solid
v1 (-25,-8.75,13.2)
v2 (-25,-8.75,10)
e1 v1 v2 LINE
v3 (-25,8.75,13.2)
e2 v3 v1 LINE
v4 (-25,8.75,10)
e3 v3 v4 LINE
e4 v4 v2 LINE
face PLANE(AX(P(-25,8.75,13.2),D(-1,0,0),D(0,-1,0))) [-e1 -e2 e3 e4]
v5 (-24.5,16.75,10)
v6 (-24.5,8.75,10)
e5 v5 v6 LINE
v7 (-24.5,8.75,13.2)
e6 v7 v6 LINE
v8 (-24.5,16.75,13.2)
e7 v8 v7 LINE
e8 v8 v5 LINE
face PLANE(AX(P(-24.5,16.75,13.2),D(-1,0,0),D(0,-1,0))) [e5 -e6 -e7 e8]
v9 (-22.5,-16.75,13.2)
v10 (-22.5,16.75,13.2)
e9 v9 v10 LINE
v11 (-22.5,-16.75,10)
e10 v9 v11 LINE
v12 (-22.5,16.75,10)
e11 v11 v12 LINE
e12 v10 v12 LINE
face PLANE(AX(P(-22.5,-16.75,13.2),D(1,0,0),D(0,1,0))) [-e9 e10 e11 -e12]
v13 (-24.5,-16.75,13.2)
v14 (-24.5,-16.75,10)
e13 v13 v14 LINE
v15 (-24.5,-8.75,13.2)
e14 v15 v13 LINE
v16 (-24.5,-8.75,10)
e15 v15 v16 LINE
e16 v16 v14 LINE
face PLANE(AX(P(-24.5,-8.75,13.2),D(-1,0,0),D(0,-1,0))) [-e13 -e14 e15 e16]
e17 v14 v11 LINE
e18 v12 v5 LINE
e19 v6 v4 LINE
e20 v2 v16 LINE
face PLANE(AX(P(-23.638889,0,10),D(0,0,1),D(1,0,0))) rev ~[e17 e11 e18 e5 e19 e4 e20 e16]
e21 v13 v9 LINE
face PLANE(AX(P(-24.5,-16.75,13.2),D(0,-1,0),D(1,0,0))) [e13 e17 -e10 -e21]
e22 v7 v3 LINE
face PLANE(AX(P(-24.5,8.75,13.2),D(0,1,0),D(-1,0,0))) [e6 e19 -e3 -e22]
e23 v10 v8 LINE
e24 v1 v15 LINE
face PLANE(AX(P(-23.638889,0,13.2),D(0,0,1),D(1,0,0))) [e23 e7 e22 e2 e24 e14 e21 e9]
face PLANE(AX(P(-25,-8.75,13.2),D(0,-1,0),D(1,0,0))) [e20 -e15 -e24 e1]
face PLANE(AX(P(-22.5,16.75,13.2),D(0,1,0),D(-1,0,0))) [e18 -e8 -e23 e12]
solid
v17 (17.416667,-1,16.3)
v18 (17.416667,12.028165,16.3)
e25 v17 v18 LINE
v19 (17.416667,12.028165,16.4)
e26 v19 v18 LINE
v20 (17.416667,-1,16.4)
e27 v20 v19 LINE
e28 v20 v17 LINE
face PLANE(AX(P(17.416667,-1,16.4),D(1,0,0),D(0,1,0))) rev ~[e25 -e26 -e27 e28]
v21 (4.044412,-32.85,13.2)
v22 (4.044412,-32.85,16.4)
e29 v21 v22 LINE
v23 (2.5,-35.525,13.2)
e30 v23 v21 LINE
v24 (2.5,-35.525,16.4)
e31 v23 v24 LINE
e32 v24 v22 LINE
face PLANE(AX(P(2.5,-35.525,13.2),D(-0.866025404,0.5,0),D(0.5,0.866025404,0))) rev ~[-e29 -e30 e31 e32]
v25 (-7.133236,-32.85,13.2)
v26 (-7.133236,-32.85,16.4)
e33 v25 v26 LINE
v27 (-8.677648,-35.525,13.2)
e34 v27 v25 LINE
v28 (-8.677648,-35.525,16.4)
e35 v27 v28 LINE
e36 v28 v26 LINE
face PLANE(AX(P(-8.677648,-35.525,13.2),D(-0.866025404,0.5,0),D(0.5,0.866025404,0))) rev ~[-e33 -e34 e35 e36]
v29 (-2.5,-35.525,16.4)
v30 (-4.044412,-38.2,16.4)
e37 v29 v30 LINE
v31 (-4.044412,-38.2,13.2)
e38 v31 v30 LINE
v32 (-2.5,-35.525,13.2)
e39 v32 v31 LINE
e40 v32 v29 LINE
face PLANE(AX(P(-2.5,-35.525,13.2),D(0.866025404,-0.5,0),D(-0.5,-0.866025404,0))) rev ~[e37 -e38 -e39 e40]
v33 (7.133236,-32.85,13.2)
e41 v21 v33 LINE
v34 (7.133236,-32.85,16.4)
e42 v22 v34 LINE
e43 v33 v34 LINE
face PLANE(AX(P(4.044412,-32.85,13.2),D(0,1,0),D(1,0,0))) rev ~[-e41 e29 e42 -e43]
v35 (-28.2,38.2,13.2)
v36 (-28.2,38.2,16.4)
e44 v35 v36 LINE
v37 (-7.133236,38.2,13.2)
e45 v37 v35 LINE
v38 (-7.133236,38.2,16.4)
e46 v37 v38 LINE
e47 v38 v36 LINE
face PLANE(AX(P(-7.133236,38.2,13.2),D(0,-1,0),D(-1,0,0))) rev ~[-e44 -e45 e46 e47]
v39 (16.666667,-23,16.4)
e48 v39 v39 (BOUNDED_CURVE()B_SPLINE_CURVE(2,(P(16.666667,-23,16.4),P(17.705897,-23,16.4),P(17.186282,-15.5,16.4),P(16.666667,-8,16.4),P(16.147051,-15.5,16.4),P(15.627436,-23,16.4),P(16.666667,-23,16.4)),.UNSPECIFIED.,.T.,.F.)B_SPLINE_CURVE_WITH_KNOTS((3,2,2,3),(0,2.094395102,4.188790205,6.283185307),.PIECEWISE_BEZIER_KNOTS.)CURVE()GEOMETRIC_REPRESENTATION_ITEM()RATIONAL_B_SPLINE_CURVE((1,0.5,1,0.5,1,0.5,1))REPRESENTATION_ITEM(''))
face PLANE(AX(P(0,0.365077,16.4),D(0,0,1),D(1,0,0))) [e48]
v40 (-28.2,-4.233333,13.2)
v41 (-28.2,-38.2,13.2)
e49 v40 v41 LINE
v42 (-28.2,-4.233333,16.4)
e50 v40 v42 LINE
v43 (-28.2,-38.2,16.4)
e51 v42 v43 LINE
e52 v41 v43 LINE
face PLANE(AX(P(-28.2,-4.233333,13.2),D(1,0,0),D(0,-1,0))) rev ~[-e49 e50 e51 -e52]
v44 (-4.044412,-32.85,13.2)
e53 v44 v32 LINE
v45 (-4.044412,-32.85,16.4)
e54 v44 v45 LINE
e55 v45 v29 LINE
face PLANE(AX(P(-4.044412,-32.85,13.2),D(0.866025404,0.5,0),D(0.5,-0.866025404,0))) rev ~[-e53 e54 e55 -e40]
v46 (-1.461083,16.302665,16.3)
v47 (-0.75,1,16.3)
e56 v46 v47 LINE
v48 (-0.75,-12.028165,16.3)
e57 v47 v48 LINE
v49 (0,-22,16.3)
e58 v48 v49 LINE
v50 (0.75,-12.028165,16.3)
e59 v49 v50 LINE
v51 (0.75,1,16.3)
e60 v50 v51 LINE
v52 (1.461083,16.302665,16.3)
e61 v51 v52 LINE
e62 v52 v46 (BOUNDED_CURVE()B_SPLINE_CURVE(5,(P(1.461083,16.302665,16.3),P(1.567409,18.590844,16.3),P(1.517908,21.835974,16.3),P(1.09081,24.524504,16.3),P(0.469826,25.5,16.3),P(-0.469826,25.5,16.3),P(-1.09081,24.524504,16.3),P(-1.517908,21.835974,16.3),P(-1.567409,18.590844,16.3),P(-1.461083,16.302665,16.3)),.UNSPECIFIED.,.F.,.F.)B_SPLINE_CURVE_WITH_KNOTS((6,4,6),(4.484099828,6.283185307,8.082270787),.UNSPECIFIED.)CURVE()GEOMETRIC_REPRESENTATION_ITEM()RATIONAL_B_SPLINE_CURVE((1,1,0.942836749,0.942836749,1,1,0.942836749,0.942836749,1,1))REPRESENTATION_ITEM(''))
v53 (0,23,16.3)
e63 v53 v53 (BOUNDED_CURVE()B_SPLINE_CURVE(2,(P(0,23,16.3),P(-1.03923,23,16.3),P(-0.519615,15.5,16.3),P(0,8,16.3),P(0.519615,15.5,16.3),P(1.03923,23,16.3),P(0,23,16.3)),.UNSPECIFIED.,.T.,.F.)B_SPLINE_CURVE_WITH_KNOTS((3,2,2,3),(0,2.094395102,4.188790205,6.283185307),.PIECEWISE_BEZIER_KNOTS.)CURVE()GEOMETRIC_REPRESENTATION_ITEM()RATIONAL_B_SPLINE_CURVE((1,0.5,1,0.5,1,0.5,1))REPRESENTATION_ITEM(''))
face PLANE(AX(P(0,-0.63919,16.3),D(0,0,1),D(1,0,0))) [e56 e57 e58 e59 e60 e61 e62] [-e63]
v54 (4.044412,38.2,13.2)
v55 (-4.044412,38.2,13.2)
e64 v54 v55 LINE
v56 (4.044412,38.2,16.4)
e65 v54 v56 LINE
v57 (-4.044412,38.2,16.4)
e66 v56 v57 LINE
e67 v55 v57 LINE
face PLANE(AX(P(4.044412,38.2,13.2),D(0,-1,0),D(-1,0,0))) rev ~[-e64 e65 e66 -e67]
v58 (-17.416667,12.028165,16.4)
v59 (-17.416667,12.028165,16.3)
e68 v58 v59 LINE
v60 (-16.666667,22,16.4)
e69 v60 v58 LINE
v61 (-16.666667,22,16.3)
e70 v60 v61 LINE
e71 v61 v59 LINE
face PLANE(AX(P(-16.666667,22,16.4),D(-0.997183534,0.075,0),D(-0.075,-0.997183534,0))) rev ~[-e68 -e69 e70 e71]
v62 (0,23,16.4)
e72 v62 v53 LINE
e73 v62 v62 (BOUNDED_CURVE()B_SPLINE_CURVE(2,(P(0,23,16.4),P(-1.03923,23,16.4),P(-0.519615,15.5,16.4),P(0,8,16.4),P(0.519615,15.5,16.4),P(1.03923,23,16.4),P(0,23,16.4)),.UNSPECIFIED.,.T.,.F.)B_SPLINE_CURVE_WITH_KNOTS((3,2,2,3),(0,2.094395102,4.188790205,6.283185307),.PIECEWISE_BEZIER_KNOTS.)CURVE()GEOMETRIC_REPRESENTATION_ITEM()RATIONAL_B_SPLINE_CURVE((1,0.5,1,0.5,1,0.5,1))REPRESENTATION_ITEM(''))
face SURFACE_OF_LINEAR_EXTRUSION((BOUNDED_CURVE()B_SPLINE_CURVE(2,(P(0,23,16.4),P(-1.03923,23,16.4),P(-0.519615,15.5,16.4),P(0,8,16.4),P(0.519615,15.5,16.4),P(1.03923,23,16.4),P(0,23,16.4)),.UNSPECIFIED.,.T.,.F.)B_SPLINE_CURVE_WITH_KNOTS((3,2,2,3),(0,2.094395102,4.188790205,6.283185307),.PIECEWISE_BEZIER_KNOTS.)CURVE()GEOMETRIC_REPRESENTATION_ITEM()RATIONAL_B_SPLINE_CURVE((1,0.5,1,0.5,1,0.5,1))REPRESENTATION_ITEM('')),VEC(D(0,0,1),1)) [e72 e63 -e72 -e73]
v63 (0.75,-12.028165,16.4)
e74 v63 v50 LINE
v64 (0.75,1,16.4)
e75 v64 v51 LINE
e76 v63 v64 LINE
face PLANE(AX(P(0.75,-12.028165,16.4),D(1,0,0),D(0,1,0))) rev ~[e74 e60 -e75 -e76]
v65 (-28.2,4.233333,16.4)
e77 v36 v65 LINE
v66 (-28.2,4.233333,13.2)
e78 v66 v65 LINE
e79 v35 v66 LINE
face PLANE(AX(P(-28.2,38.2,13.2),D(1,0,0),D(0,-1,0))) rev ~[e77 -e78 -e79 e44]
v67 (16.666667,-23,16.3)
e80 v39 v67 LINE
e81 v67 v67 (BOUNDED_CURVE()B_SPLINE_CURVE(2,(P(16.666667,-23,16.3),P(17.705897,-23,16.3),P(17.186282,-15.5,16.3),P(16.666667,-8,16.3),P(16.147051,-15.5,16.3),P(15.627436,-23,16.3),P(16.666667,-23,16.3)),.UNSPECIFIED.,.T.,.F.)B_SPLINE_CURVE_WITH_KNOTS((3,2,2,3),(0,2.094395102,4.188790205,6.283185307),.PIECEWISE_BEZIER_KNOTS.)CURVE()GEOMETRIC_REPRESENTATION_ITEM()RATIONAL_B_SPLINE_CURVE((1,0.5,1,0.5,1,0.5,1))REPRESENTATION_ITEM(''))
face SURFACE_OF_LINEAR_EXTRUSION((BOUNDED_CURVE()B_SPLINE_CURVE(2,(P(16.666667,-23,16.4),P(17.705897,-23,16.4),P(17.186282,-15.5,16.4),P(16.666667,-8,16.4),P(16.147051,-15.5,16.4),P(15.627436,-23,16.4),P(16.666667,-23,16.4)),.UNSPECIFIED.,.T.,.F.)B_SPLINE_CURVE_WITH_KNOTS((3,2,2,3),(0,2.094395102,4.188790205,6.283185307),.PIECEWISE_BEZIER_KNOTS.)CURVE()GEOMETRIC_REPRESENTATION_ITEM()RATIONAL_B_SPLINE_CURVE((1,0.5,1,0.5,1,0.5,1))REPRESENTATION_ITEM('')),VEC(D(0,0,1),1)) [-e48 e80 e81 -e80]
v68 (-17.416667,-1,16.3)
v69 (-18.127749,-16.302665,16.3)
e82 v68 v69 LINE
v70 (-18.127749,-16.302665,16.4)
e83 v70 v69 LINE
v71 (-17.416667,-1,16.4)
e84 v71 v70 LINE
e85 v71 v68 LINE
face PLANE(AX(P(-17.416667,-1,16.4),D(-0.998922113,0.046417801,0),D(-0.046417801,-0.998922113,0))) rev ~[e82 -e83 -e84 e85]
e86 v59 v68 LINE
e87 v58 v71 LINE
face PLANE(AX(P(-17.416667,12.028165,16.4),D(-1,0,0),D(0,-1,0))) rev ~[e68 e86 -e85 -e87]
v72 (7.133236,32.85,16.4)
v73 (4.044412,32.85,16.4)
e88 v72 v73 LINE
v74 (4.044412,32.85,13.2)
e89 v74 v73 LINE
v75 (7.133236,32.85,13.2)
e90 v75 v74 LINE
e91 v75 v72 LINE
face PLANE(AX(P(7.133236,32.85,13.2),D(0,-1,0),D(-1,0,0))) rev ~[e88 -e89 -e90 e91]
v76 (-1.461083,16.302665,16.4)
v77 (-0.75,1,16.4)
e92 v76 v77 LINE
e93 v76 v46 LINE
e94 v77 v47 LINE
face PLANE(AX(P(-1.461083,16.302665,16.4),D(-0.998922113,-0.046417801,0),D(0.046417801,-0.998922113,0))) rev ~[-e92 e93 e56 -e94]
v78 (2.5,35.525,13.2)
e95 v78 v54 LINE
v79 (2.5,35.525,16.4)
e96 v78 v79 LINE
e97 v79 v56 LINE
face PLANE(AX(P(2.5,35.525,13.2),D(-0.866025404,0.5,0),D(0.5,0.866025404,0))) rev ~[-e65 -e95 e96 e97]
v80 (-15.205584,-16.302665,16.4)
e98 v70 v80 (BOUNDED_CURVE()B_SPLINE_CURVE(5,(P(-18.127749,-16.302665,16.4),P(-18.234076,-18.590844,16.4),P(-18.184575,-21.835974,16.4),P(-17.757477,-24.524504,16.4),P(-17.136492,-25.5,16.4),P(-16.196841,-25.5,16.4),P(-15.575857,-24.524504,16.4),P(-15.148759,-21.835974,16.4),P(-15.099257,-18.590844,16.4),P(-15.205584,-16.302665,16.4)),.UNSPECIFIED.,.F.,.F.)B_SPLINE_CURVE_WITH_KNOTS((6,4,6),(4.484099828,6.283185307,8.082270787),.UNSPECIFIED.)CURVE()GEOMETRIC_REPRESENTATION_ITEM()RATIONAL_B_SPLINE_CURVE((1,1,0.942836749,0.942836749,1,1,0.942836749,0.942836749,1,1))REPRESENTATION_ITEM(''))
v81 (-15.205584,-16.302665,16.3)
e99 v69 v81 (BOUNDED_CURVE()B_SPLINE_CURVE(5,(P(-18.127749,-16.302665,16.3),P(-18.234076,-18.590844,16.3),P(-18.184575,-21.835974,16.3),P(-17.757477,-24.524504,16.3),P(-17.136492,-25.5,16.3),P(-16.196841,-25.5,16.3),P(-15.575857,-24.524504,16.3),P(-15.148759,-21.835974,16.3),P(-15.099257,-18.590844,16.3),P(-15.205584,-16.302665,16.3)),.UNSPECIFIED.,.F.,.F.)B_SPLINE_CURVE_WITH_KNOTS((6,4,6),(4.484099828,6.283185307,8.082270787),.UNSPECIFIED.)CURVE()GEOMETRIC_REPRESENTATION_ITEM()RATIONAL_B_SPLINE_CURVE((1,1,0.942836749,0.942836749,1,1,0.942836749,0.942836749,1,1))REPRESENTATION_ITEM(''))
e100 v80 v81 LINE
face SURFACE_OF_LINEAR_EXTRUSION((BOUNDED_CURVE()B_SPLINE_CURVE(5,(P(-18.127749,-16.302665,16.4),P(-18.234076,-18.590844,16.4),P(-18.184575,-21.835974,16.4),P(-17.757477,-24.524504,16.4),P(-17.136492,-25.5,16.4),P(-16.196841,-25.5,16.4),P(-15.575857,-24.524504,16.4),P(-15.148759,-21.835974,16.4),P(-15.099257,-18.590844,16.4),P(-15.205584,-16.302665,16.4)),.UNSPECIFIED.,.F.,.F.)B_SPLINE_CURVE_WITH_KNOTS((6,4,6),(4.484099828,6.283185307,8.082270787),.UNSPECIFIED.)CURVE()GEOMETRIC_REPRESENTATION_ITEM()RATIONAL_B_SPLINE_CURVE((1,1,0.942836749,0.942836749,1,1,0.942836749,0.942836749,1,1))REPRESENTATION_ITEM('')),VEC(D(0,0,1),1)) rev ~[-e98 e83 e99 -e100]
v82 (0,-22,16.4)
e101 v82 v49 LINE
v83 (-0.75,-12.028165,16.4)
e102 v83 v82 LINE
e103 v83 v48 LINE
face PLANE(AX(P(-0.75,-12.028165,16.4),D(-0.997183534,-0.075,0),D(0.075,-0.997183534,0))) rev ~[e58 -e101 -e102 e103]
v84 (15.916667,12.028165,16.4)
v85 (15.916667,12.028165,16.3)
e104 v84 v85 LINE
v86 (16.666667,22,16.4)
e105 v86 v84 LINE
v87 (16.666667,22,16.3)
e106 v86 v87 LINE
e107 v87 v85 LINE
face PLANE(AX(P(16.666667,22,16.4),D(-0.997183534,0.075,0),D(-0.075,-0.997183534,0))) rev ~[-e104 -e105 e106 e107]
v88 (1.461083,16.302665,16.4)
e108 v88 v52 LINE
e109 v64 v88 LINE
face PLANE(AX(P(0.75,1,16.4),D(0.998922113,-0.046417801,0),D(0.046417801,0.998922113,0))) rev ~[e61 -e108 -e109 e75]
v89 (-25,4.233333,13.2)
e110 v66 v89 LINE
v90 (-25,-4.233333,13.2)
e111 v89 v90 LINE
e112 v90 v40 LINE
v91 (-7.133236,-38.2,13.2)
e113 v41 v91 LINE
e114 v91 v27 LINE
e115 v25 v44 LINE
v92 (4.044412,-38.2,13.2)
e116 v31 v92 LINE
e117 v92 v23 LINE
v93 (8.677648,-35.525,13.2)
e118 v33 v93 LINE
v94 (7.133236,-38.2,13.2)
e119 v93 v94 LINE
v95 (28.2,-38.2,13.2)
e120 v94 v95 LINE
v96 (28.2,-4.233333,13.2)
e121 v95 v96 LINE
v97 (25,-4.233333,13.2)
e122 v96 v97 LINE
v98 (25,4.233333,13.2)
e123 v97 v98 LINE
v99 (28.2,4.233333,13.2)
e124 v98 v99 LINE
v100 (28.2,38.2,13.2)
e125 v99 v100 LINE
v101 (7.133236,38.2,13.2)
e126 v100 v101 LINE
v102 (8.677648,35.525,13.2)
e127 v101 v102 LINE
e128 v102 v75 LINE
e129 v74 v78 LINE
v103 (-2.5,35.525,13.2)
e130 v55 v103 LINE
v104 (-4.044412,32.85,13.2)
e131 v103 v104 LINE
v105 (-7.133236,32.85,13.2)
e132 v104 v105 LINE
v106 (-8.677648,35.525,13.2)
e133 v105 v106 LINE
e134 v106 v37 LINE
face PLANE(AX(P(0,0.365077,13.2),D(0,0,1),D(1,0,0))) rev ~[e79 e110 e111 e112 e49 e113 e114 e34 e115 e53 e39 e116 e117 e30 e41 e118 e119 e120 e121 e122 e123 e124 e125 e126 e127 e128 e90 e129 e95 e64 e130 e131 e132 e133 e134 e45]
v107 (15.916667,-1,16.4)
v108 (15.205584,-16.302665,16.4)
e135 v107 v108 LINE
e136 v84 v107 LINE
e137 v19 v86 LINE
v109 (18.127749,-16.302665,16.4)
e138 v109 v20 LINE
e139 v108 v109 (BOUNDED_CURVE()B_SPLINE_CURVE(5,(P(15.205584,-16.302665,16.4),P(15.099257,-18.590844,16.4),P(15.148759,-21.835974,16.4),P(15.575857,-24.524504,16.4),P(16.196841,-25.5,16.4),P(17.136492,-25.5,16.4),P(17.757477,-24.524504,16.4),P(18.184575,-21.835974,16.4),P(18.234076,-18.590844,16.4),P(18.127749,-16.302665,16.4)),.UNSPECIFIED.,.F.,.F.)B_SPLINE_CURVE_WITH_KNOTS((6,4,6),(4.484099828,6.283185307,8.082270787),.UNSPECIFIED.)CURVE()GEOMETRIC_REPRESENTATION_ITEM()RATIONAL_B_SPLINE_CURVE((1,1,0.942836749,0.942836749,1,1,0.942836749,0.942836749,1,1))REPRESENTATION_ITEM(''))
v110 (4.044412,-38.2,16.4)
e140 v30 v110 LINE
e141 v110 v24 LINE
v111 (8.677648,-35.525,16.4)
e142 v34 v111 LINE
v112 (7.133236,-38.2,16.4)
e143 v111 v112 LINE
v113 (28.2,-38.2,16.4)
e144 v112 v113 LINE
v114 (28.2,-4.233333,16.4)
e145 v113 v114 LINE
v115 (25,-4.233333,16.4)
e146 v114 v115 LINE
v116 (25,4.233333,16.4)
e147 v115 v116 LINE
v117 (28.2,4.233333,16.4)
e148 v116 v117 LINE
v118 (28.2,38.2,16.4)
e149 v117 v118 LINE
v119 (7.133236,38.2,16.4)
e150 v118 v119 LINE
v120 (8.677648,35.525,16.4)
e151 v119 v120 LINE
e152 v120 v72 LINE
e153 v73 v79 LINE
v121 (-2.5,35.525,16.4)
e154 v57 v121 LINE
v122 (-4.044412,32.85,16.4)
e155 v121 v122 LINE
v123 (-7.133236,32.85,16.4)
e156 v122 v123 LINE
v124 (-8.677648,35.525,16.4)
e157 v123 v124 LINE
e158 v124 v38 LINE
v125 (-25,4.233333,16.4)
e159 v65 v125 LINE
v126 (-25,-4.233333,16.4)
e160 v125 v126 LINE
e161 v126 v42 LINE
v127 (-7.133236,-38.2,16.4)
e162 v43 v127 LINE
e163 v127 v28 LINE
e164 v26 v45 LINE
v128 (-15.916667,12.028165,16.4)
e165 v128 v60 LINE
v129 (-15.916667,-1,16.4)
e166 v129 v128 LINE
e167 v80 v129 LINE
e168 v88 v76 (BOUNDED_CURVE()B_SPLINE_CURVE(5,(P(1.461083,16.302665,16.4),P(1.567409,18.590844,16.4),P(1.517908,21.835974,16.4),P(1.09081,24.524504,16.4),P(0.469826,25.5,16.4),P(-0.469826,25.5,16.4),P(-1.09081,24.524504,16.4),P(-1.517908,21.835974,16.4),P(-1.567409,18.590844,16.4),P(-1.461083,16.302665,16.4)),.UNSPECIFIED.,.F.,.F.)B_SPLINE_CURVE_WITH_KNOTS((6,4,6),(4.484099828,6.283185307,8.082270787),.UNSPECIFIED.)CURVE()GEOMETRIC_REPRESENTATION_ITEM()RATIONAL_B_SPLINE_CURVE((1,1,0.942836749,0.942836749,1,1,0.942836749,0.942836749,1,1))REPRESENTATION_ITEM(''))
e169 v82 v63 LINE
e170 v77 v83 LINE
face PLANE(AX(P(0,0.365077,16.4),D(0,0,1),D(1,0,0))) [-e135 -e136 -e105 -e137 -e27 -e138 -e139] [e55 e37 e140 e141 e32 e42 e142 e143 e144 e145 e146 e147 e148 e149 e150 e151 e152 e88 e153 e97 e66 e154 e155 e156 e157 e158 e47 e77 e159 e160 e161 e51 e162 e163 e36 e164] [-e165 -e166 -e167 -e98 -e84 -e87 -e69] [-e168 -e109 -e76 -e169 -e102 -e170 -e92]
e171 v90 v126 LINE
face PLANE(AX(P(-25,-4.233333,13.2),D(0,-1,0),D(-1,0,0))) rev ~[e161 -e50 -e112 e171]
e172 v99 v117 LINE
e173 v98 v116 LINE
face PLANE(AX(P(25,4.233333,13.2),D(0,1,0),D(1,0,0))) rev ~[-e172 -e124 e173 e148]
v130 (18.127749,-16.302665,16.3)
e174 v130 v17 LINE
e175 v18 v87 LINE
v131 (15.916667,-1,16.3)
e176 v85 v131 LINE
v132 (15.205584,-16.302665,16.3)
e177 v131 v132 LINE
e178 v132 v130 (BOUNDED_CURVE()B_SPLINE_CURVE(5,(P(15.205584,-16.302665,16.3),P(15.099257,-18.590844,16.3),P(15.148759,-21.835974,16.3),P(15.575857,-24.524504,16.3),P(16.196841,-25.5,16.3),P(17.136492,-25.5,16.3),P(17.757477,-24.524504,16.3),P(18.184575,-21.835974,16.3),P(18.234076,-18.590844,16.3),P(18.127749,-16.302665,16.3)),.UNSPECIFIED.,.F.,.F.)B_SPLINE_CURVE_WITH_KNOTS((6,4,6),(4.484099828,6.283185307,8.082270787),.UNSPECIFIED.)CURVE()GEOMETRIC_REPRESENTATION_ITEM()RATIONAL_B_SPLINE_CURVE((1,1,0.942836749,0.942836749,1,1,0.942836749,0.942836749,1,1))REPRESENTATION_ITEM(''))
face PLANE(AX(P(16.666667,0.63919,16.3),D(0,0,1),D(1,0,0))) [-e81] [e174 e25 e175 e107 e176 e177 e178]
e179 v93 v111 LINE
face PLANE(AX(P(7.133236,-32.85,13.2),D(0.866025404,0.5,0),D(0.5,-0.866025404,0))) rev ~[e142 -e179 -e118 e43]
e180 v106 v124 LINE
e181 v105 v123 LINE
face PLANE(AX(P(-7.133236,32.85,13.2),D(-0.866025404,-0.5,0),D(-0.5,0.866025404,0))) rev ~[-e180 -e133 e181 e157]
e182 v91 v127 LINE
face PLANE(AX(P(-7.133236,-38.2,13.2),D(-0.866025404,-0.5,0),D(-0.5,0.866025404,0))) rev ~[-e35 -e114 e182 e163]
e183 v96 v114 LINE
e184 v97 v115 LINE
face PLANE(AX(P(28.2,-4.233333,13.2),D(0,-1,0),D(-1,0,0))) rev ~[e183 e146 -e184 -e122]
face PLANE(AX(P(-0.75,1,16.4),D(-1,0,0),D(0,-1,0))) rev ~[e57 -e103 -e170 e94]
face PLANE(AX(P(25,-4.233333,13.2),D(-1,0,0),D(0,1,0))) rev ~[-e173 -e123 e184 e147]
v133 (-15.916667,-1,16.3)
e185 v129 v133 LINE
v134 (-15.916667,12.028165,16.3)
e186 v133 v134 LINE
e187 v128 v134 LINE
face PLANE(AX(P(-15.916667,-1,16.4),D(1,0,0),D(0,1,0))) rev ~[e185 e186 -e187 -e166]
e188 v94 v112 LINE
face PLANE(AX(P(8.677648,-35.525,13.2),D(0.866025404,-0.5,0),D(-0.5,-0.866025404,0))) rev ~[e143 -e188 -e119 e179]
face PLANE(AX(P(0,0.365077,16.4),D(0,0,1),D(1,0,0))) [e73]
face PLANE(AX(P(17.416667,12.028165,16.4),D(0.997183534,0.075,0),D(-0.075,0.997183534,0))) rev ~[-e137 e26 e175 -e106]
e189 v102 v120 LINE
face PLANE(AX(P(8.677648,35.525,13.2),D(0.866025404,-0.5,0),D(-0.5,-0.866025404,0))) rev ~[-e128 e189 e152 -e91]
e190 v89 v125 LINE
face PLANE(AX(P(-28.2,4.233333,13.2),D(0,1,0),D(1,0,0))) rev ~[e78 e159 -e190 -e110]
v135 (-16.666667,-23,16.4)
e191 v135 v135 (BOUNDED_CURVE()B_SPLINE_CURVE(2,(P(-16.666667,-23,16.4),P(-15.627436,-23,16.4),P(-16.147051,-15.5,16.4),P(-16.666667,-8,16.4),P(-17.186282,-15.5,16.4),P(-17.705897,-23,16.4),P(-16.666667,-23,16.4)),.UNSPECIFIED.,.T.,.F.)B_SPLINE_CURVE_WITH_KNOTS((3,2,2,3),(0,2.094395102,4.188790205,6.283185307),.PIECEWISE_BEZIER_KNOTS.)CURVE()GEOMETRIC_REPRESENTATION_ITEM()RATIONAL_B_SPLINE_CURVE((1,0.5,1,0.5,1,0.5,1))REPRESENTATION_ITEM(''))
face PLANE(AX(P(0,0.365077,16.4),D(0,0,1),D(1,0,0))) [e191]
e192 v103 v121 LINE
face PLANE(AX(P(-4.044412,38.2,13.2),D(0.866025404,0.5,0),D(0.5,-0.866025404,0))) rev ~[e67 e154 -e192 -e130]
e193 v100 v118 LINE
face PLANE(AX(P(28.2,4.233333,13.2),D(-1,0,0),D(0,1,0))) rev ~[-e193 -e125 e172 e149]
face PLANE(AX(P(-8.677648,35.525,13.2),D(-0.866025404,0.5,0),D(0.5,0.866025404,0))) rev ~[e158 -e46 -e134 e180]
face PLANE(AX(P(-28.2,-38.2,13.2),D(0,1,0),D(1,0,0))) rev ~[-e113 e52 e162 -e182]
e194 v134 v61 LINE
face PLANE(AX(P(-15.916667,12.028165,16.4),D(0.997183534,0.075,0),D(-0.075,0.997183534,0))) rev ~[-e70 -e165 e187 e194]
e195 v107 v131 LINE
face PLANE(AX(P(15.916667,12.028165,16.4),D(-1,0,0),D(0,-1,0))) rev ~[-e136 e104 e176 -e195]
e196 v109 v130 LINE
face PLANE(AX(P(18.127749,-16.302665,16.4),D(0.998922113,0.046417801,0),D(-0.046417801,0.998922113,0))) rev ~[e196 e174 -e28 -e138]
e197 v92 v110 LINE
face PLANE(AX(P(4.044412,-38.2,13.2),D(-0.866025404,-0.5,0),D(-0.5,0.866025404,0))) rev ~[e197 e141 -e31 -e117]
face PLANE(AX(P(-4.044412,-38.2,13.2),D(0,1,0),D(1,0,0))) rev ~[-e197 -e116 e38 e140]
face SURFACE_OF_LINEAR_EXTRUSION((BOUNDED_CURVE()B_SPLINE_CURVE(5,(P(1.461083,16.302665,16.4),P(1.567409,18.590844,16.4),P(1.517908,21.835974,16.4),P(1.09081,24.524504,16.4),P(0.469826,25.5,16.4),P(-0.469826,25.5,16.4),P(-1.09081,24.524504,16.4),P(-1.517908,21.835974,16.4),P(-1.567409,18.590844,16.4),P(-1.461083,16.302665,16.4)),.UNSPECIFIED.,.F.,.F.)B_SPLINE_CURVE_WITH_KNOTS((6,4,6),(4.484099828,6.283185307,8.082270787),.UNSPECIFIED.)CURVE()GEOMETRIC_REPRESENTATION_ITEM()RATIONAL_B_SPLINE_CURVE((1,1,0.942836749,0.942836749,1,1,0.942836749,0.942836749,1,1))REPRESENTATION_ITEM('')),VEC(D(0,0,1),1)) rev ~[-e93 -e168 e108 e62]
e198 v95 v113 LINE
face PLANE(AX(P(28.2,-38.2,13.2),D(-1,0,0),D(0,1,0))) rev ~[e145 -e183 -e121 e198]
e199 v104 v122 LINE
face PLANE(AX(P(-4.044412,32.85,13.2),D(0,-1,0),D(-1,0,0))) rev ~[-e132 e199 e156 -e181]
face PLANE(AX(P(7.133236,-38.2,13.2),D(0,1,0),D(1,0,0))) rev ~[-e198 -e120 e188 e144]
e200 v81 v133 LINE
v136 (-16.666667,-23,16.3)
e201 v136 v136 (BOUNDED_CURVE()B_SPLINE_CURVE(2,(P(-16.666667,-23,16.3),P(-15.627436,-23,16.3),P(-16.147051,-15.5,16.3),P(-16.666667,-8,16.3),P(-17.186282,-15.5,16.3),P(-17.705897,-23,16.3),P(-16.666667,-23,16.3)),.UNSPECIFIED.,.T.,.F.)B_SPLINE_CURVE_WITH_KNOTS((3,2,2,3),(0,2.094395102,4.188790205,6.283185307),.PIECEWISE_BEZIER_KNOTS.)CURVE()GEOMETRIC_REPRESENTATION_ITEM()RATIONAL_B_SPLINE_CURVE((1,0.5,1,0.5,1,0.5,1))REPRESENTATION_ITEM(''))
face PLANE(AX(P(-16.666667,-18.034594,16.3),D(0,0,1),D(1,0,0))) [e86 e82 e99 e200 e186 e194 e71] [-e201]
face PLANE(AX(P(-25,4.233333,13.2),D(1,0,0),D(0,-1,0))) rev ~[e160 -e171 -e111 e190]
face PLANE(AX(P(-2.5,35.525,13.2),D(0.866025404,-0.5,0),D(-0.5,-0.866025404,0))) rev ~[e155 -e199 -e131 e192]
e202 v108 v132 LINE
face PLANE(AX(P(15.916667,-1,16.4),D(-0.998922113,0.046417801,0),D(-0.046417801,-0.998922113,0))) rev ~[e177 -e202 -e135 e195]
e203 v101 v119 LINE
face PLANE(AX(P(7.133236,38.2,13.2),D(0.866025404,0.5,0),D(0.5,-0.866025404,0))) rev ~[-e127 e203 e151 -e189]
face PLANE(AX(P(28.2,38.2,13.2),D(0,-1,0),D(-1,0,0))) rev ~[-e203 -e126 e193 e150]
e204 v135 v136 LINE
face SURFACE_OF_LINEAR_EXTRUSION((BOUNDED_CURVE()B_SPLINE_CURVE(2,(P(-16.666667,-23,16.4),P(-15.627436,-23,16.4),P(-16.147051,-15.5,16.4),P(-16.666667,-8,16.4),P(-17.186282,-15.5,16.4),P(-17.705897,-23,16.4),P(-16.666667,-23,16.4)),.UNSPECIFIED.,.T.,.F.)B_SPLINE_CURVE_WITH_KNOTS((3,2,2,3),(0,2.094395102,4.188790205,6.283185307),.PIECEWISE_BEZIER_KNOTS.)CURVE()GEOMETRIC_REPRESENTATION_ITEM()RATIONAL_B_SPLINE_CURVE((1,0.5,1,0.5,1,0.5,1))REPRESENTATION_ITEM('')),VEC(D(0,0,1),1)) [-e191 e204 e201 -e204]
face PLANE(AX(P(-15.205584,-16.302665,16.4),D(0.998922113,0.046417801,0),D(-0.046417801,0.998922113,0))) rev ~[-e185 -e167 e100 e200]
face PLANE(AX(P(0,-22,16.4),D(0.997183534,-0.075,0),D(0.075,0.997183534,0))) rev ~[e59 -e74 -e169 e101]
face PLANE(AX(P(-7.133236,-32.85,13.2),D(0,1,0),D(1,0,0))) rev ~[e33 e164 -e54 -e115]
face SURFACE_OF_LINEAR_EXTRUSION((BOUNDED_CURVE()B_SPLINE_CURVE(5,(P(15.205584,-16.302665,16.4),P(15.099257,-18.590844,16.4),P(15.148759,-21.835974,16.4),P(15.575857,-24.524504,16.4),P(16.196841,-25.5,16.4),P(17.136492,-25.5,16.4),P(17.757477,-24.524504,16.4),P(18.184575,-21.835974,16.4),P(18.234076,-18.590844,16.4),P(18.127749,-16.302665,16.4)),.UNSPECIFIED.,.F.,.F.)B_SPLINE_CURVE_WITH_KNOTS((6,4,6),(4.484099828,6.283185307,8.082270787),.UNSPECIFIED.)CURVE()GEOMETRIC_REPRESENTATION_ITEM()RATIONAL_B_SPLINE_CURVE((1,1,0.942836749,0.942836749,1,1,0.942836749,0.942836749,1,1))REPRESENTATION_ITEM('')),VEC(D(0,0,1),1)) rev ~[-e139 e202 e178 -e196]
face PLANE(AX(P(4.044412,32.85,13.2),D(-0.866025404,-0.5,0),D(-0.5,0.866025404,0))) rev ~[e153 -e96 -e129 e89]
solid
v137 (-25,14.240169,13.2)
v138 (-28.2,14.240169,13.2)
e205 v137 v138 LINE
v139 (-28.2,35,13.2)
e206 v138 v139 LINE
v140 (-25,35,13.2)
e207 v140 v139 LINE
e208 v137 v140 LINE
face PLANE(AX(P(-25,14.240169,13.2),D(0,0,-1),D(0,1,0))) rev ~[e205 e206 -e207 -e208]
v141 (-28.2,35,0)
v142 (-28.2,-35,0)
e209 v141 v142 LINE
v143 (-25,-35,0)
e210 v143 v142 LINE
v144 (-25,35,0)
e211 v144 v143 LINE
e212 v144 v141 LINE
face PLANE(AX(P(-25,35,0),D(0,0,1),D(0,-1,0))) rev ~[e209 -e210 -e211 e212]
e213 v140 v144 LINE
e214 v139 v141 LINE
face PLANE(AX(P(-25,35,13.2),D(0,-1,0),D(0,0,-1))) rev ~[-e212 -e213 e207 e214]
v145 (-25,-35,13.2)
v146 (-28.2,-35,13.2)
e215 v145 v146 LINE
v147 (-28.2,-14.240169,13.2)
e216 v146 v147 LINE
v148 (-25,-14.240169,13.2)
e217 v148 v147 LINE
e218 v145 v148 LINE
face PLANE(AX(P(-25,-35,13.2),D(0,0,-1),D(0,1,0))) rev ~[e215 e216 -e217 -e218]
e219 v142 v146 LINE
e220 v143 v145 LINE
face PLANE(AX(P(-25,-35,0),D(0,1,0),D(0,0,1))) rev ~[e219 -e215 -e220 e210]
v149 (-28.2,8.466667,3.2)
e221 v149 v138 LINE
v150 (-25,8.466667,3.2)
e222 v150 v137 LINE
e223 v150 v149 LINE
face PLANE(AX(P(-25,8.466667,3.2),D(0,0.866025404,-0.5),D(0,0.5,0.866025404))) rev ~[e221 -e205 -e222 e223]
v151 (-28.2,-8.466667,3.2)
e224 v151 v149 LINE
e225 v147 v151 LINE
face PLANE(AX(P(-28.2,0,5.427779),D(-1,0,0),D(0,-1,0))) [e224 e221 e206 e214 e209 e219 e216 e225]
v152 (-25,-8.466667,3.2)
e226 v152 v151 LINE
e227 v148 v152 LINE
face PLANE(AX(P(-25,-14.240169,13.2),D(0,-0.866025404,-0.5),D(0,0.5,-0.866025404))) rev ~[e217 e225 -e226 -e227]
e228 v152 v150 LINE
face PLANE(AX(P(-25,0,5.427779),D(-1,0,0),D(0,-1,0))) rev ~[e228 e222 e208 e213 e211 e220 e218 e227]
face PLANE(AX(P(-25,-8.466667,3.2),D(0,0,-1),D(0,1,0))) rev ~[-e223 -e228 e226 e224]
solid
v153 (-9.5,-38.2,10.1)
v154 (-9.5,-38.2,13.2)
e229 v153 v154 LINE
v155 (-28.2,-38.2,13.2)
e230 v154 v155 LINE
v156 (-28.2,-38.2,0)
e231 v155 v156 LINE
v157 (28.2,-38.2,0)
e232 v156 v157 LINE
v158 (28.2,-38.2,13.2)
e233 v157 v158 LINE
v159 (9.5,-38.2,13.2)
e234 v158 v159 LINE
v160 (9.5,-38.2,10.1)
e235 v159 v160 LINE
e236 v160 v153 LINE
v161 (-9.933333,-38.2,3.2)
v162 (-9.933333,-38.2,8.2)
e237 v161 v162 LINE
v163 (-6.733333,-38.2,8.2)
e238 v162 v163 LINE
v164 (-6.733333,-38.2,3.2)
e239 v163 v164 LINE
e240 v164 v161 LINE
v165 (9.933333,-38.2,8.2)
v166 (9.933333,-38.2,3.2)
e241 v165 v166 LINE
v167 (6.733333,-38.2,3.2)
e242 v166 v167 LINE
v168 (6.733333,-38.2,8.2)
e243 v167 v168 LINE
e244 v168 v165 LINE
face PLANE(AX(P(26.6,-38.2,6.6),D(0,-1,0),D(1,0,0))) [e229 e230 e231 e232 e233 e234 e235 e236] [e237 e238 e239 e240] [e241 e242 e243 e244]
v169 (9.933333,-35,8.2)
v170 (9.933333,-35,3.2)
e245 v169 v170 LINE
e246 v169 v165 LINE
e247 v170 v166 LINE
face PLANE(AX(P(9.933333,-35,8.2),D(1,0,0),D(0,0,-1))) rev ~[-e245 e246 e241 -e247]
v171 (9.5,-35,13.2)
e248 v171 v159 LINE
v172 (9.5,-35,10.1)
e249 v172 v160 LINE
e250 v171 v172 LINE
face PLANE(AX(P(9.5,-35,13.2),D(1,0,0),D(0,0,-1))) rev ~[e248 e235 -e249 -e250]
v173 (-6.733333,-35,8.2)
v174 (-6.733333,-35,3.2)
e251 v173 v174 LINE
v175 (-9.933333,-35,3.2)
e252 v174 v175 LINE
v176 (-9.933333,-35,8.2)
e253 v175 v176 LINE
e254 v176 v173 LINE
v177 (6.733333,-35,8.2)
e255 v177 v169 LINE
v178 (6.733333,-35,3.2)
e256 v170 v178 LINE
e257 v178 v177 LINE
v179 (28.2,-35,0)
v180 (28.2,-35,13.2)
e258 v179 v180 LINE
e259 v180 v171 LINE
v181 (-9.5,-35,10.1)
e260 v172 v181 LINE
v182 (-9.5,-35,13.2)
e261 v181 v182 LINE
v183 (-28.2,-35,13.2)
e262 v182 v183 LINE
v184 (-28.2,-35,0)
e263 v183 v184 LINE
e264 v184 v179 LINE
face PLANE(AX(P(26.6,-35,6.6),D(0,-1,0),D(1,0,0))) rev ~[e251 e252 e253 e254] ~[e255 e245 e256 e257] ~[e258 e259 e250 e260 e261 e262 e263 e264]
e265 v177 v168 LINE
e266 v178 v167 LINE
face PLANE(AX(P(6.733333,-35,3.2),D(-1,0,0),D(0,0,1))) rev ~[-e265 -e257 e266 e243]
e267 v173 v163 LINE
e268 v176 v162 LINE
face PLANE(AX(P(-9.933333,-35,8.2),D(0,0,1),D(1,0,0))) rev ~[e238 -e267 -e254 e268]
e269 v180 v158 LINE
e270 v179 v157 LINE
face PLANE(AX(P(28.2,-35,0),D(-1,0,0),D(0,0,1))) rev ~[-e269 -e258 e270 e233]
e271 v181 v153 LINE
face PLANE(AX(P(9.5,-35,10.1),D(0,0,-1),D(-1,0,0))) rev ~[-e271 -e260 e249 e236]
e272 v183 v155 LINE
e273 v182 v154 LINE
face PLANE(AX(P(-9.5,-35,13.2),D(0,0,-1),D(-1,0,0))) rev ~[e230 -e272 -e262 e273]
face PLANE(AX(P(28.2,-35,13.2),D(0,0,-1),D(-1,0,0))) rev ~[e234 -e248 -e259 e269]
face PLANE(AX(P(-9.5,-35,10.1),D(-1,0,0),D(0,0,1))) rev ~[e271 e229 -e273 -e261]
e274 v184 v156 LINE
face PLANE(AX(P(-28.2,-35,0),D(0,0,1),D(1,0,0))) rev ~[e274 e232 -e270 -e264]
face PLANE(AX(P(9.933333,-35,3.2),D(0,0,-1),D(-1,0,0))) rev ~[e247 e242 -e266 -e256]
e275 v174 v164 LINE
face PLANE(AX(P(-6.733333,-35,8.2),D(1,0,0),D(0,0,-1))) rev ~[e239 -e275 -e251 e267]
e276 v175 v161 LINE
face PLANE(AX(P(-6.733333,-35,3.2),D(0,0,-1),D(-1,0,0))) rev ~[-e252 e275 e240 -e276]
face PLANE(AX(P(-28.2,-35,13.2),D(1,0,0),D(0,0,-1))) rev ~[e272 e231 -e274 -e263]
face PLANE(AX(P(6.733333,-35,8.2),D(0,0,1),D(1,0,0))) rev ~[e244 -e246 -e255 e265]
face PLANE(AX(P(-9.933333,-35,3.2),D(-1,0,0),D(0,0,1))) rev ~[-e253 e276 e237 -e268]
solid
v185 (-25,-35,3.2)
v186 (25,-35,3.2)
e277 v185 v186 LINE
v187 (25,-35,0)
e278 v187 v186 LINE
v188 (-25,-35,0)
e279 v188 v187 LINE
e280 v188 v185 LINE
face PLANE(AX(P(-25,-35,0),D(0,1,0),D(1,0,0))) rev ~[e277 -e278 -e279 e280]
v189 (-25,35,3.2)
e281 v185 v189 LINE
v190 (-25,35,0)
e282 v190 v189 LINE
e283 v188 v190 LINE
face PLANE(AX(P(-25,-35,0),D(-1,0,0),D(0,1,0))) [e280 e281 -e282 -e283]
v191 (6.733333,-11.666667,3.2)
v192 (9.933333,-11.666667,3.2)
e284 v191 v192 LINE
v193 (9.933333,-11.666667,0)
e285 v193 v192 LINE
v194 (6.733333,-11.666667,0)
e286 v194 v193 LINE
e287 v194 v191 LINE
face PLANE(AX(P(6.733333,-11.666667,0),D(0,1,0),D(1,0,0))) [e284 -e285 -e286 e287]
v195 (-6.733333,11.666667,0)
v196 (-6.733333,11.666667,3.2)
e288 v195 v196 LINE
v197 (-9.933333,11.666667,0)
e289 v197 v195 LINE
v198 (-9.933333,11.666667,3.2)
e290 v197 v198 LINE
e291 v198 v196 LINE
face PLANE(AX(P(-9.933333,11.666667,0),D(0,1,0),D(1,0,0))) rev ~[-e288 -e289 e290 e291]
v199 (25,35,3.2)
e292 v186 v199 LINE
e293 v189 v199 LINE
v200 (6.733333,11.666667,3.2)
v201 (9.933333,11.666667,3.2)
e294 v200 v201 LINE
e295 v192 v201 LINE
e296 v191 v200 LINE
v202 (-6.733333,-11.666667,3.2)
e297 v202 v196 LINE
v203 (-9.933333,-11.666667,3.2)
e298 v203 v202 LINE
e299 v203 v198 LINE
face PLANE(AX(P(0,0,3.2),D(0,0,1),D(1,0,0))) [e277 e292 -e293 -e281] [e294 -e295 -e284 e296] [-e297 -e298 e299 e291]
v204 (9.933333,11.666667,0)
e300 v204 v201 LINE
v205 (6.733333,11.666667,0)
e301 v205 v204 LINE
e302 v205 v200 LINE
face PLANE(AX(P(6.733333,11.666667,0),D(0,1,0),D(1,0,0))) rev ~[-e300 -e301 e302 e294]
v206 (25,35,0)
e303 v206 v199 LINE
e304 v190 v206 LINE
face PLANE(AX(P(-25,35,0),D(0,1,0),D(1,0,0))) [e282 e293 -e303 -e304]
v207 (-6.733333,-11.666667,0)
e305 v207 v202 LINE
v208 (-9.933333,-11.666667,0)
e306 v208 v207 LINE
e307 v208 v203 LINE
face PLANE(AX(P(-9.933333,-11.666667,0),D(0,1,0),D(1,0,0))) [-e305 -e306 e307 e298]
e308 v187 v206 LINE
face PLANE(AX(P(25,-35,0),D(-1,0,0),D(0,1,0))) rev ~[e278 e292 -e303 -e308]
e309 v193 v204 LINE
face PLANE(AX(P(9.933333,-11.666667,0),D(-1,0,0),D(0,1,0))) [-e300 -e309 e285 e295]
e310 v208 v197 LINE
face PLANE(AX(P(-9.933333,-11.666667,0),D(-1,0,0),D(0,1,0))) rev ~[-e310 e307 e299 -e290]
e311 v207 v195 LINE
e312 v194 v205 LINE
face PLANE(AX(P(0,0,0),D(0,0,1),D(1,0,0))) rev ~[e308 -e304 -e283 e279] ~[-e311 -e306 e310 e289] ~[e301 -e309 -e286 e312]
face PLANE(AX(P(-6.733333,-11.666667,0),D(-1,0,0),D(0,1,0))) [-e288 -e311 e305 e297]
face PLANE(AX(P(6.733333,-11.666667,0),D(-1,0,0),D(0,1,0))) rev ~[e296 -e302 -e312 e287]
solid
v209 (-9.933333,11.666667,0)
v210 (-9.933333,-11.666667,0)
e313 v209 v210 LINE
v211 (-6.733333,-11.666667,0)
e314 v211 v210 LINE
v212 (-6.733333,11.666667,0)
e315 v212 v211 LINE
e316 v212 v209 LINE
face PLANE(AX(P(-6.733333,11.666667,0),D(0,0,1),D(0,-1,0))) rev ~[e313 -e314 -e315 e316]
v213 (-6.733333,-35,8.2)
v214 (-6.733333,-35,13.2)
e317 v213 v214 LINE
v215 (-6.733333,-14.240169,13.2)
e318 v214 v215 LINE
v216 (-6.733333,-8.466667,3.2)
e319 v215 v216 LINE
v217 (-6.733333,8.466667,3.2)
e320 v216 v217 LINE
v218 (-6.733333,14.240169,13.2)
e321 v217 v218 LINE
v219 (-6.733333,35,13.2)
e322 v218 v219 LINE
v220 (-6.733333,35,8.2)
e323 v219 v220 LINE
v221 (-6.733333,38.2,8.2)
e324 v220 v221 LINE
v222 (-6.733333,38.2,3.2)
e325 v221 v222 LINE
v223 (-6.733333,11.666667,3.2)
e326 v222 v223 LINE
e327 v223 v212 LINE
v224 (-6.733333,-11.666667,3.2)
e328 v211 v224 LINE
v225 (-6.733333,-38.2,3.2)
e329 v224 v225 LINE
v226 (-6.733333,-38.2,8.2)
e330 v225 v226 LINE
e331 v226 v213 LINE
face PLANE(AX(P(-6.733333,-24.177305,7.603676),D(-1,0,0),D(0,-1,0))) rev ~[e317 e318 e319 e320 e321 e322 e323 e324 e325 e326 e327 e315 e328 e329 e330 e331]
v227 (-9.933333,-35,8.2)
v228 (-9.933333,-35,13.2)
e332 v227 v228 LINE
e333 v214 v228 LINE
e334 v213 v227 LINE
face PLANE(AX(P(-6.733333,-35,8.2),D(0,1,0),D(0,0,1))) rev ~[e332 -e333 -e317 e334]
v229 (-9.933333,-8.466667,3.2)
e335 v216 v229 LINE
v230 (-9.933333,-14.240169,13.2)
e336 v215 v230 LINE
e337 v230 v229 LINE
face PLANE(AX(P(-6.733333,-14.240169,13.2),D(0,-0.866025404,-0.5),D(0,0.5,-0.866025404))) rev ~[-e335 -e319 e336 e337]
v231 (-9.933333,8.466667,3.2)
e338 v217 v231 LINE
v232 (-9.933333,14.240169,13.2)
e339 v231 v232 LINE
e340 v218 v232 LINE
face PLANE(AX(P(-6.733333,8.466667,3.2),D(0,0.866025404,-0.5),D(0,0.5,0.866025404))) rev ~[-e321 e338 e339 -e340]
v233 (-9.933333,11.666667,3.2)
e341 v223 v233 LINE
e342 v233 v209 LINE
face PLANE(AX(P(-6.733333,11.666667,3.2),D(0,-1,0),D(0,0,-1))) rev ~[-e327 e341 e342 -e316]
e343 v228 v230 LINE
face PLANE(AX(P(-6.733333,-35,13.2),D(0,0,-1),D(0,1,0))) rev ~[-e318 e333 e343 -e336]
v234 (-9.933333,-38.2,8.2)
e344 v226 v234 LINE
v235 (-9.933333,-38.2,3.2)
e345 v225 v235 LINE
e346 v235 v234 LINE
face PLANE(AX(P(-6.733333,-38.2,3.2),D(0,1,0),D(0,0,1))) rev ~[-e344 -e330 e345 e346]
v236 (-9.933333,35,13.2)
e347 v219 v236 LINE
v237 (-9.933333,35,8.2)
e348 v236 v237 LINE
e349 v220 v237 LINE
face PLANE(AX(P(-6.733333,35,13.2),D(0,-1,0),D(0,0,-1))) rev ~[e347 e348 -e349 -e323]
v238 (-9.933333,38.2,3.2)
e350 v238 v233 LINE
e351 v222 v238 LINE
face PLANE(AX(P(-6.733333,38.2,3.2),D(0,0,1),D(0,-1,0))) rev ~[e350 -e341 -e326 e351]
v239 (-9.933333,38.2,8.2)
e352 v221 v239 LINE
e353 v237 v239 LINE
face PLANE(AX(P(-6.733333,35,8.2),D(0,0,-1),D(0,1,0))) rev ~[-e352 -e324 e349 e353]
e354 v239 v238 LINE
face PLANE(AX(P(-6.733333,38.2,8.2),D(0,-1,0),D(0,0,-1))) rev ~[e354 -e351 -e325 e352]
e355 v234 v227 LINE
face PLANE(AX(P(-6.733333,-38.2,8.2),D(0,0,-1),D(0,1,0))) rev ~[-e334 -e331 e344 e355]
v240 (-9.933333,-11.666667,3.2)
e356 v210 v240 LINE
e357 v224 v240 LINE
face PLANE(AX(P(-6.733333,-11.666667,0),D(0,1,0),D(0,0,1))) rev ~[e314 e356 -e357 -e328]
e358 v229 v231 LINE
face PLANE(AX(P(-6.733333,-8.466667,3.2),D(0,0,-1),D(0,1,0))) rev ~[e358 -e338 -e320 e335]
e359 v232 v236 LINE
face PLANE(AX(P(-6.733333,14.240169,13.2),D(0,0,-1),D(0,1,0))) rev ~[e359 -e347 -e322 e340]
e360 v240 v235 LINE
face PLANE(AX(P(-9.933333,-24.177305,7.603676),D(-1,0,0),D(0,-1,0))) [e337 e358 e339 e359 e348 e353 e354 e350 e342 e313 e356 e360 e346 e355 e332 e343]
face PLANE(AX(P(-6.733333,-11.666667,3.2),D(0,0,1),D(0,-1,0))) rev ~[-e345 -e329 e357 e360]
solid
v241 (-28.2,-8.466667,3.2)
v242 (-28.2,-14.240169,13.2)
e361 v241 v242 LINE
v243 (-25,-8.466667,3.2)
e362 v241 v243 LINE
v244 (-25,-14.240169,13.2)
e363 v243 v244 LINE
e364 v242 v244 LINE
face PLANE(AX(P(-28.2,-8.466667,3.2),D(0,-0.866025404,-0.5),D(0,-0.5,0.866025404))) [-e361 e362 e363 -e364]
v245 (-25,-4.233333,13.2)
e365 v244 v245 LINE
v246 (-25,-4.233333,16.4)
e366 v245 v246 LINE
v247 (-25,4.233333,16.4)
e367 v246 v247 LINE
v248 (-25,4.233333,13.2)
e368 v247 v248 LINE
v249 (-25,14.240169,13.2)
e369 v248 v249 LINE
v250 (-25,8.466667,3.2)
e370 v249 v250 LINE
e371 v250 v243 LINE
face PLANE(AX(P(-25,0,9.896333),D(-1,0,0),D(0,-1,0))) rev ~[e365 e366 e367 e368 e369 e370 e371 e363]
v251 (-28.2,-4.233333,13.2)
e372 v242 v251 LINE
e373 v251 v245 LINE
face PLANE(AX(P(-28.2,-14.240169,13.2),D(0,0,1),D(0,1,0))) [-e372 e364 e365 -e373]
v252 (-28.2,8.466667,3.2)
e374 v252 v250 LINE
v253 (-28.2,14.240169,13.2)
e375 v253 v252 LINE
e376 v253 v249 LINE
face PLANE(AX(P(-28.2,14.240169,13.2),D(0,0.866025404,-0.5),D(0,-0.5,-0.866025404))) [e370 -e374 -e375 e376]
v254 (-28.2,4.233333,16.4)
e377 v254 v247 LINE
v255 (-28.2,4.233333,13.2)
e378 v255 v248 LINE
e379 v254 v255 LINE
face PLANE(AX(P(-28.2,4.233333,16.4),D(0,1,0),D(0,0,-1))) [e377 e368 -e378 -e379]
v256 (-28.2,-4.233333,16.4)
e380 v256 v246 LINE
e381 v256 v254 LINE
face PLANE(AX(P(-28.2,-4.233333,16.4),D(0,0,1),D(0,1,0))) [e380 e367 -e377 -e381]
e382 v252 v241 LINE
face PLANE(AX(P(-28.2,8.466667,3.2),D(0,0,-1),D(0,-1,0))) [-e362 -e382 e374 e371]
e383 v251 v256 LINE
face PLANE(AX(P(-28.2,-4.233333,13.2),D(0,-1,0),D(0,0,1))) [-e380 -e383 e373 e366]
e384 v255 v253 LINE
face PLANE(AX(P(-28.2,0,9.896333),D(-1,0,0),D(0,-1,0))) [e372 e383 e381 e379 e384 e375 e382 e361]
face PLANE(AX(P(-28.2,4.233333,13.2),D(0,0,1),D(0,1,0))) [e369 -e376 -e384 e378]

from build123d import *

# Parameters (mm, degrees)
F1_W      = 50
F1_H      = 70
F1_W_2    = 3.2
F1_H_2    = 23.3333333333
F2_DEPTH  = 3.2
F4_DEPTH  = 3.2
F6_DEPTH  = 3.2
F8_DEPTH  = 3.2
F10_DEPTH = 3.2
F11_W     = 18.7
F11_H     = 3.2
F12_DEPTH = 3.2
F14_DEPTH = 0.1
F16_DEPTH = 3.2


# Not quite as in the source:
# - a feature names something its author has since deleted; it is built from what else it names


with BuildPart() as f2:
    # F1 (on Top) → F2 (new body)
    with BuildSketch(Plane.XY):
        Rectangle(F1_W, F1_H)
        with Locations((-8.3333333333, 0)):
            Rectangle(F1_W_2, F1_H_2, mode=Mode.SUBTRACT)
        with Locations((8.3333333333, 0)):
            Rectangle(F1_W_2, F1_H_2, mode=Mode.SUBTRACT)
    extrude(amount=F2_DEPTH)


with BuildPart() as f4:
    # F3 (on face) → F4 (new body)
    with BuildSketch(Plane(origin=(-25, 0, 0), x_dir=(0, -1, 0), z_dir=(-1, 0, 0))):
        Polygon((-35, 13.2), (-35, 0), (35, 0), (35, 13.2), (14.2401693586, 13.2), (8.4666666667, 3.2), (-8.4666666667, 3.2), (-14.2401693586, 13.2), align=None)
    extrude(amount=F4_DEPTH)


with BuildPart() as f6:
    # F5 (on face) → F6 (new body)
    with BuildSketch(Plane(origin=(-6.7333333333, 0, 0), x_dir=(0, -1, 0), z_dir=(-1, 0, 0))):
        Polygon((38.2, 3.2), (38.2, 8.2), (35, 8.2), (35, 13.2), (14.2401693586, 13.2), (8.4666666667, 3.2), (11.6666666667, 3.2), (35, 3.2), align=None)
        Polygon((-8.4666666667, 3.2), (-14.2401693586, 13.2), (-35, 13.2), (-35, 8.2), (-38.2, 8.2), (-38.2, 3.2), (-35, 3.2), (-11.6666666667, 3.2), align=None)
        Polygon((11.6666666667, 0), (11.6666666667, 3.2), (8.4666666667, 3.2), (-8.4666666667, 3.2), (-11.6666666667, 3.2), (-11.6666666667, 0), align=None)
    extrude(amount=F6_DEPTH)


with BuildPart() as f8:
    # F7 (on face) → F8 (new body)
    with BuildSketch(Plane.XZ.offset(35)):
        Polygon((25, 3.2), (25, 0), (28.2, 0), (28.2, 13.2), (25, 13.2), align=None)
        Polygon((-25, 3.2), (-25, 0), (25, 0), (25, 3.2), (9.9333333333, 3.2), (6.7333333333, 3.2), (-6.7333333333, 3.2), (-9.9333333333, 3.2), align=None)
        Polygon((-28.2, 13.2), (-28.2, 0), (-25, 0), (-25, 3.2), (-9.9333333333, 3.2), (-9.9333333333, 8.2), (-6.7333333333, 8.2), (-6.7333333333, 3.2), (6.7333333333, 3.2), (6.7333333333, 8.2), (9.9333333333, 8.2), (9.9333333333, 3.2), (25, 3.2), (25, 13.2), (9.5, 13.2), (9.5, 10.1), (-9.5, 10.1), (-9.5, 13.2), align=None)
    extrude(amount=F8_DEPTH)


with BuildPart() as f10:
    # F9 (on face) → F10 (new body)
    with BuildSketch(Plane(origin=(-28.2, 0, 0), x_dir=(0, -1, 0), z_dir=(-1, 0, 0))):
        Polygon((-14.2401693586, 13.2), (-8.4666666667, 3.2), (8.4666666667, 3.2), (14.2401693586, 13.2), (4.2333333333, 13.2), (4.2333333333, 16.4), (-4.2333333333, 16.4), (-4.2333333333, 13.2), align=None)
    extrude(amount=-F10_DEPTH)


with BuildPart() as f12:
    # F11 (on face) → F12 (new body)
    with BuildSketch(Plane.XY.offset(13.2)):
        Polygon((-28.2, 38.2), (-28.2, 4.2333333333), (-25, 4.2333333333), (-25, -4.2333333333), (-28.2, -4.2333333333), (-28.2, -35), (-9.5, -35), (-9.5, -38.2), (-7.1332359102, -38.2), (-8.6776478803, -35.525), (-7.1332359102, -32.85), (-4.0444119701, -32.85), (-2.5, -35.525), (-4.0444119701, -38.2), (4.0444119701, -38.2), (2.5, -35.525), (4.0444119701, -32.85), (7.1332359102, -32.85), (8.6776478803, -35.525), (7.1332359102, -38.2), (9.5, -38.2), (9.5, -35), (28.2, -35), (28.2, -4.2333333333), (25, -4.2333333333), (25, 4.2333333333), (28.2, 4.2333333333), (28.2, 38.2), (7.1332359102, 38.2), (8.6776478803, 35.525), (7.1332359102, 32.85), (4.0444119701, 32.85), (2.5, 35.525), (4.0444119701, 38.2), (-4.0444119701, 38.2), (-2.5, 35.525), (-4.0444119701, 32.85), (-7.1332359102, 32.85), (-8.6776478803, 35.525), (-7.1332359102, 38.2), align=None)
        with Locations((-18.85, -36.6)):
            Rectangle(F11_W, F11_H)
        with Locations((18.85, -36.6)):
            Rectangle(F11_W, F11_H)
    extrude(amount=F12_DEPTH)

    # F13 (on face) → F14 (cut)
    with BuildSketch(Plane.XY.offset(16.4)):
        with BuildLine():
            add(Edge.make_bspline(
                [(-18.1277491736, -16.3026645297), (-18.5551299314, -25.5), (-16.6666666667, -25.5)],
                knots=[4.4840998278, 4.4840998278, 4.4840998278, 6.2831853072, 6.2831853072, 6.2831853072], degree=2, weights=[1, 0.6219680876, 1]))
            add(Edge.make_bspline(
                [(-16.6666666667, -25.5), (-14.7782034019, -25.5), (-15.2055841597, -16.3026645297)],
                knots=[0, 0, 0, 1.7990854794, 1.7990854794, 1.7990854794], degree=2, weights=[1, 0.6219680876, 1]))
            add(Edge.make_bspline(
                [(-15.2055841597, -16.3026645297), (-15.4752217273, -10.5), (-16.6666666667, -10.5), (-17.8581116061, -10.5), (-18.1277491736, -16.3026645297)],
                knots=[1.7990854794, 1.7990854794, 1.7990854794, 3.1415926536, 3.1415926536, 4.4840998278, 4.4840998278, 4.4840998278], degree=2, weights=[1, 0.7830425902, 1, 0.7830425902, 1]))
        make_face()
        with BuildLine():
            add(Edge.make_bspline(
                [(-16.6666666667, -23), (-15.6274361821, -23), (-16.1470514244, -15.5), (-16.6666666667, -8), (-17.1862819089, -15.5), (-17.7058971512, -23), (-16.6666666667, -23)],
                knots=[0, 0, 0, 2.0943951024, 2.0943951024, 4.1887902048, 4.1887902048, 6.2831853072, 6.2831853072, 6.2831853072], degree=2, weights=[1, 0.5, 1, 0.5, 1, 0.5, 1]))
        make_face(mode=Mode.SUBTRACT)
        with BuildLine():
            add(Edge.make_bspline(
                [(-15.2055841597, -16.3026645297), (-15.4752217273, -10.5), (-16.6666666667, -10.5), (-17.8581116061, -10.5), (-18.1277491736, -16.3026645297)],
                knots=[1.7990854794, 1.7990854794, 1.7990854794, 3.1415926536, 3.1415926536, 4.4840998278, 4.4840998278, 4.4840998278], degree=2, weights=[1, 0.7830425902, 1, 0.7830425902, 1]))
            Line((-15.2055841597, -16.3026645297), (-15.9166666667, -1))
            Line((-15.9166666667, -1), (-15.9166666667, 12.0281646624))
            Line((-15.9166666667, 12.0281646624), (-16.6666666667, 22))
            Line((-16.6666666667, 22), (-17.4166666667, 12.0281646624))
            Line((-17.4166666667, 12.0281646624), (-17.4166666667, -1))
            Line((-17.4166666667, -1), (-18.1277491736, -16.3026645297))
        make_face()
        with BuildLine():
            Line((-1.4610825069, 16.3026645297), (-0.75, 1))
            Line((-0.75, 1), (-0.75, -12.0281646624))
            Line((-0.75, -12.0281646624), (0, -22))
            Line((0, -22), (0.75, -12.0281646624))
            Line((0.75, -12.0281646624), (0.75, 1))
            Line((0.75, 1), (1.4610825069, 16.3026645297))
            add(Edge.make_bspline(
                [(-1.4610825069, 16.3026645297), (-1.1914449394, 10.5), (0, 10.5), (1.1914449394, 10.5), (1.4610825069, 16.3026645297)],
                knots=[1.7990854794, 1.7990854794, 1.7990854794, 3.1415926536, 3.1415926536, 4.4840998278, 4.4840998278, 4.4840998278], degree=2, weights=[1, 0.7830425902, 1, 0.7830425902, 1]))
        make_face()
        with BuildLine():
            add(Edge.make_bspline(
                [(0, 25.5), (-1.8884632647, 25.5), (-1.4610825069, 16.3026645297)],
                knots=[0, 0, 0, 1.7990854794, 1.7990854794, 1.7990854794], degree=2, weights=[1, 0.6219680876, 1]))
            add(Edge.make_bspline(
                [(-1.4610825069, 16.3026645297), (-1.1914449394, 10.5), (0, 10.5), (1.1914449394, 10.5), (1.4610825069, 16.3026645297)],
                knots=[1.7990854794, 1.7990854794, 1.7990854794, 3.1415926536, 3.1415926536, 4.4840998278, 4.4840998278, 4.4840998278], degree=2, weights=[1, 0.7830425902, 1, 0.7830425902, 1]))
            add(Edge.make_bspline(
                [(1.4610825069, 16.3026645297), (1.8884632647, 25.5), (0, 25.5)],
                knots=[4.4840998278, 4.4840998278, 4.4840998278, 6.2831853072, 6.2831853072, 6.2831853072], degree=2, weights=[1, 0.6219680876, 1]))
        make_face()
        with BuildLine():
            add(Edge.make_bspline(
                [(0, 23), (-1.0392304845, 23), (-0.5196152423, 15.5), (0, 8), (0.5196152423, 15.5), (1.0392304845, 23), (0, 23)],
                knots=[0, 0, 0, 2.0943951024, 2.0943951024, 4.1887902048, 4.1887902048, 6.2831853072, 6.2831853072, 6.2831853072], degree=2, weights=[1, 0.5, 1, 0.5, 1, 0.5, 1]))
        make_face(mode=Mode.SUBTRACT)
        with BuildLine():
            Line((18.1277491736, -16.3026645297), (17.4166666667, -1))
            Line((17.4166666667, -1), (17.4166666667, 12.0281646624))
            Line((17.4166666667, 12.0281646624), (16.6666666667, 22))
            Line((16.6666666667, 22), (15.9166666667, 12.0281646624))
            Line((15.9166666667, 12.0281646624), (15.9166666667, -1))
            Line((15.9166666667, -1), (15.2055841597, -16.3026645297))
            add(Edge.make_bspline(
                [(18.1277491736, -16.3026645297), (17.8581116061, -10.5), (16.6666666667, -10.5), (15.4752217273, -10.5), (15.2055841597, -16.3026645297)],
                knots=[1.7990854794, 1.7990854794, 1.7990854794, 3.1415926536, 3.1415926536, 4.4840998278, 4.4840998278, 4.4840998278], degree=2, weights=[1, 0.7830425902, 1, 0.7830425902, 1]))
        make_face()
        with BuildLine():
            add(Edge.make_bspline(
                [(16.6666666667, -25.5), (18.5551299314, -25.5), (18.1277491736, -16.3026645297)],
                knots=[0, 0, 0, 1.7990854794, 1.7990854794, 1.7990854794], degree=2, weights=[1, 0.6219680876, 1]))
            add(Edge.make_bspline(
                [(18.1277491736, -16.3026645297), (17.8581116061, -10.5), (16.6666666667, -10.5), (15.4752217273, -10.5), (15.2055841597, -16.3026645297)],
                knots=[1.7990854794, 1.7990854794, 1.7990854794, 3.1415926536, 3.1415926536, 4.4840998278, 4.4840998278, 4.4840998278], degree=2, weights=[1, 0.7830425902, 1, 0.7830425902, 1]))
            add(Edge.make_bspline(
                [(15.2055841597, -16.3026645297), (14.7782034019, -25.5), (16.6666666667, -25.5)],
                knots=[4.4840998278, 4.4840998278, 4.4840998278, 6.2831853072, 6.2831853072, 6.2831853072], degree=2, weights=[1, 0.6219680876, 1]))
        make_face()
        with BuildLine():
            add(Edge.make_bspline(
                [(16.6666666667, -23), (17.7058971512, -23), (17.1862819089, -15.5), (16.6666666667, -8), (16.1470514244, -15.5), (15.6274361821, -23), (16.6666666667, -23)],
                knots=[0, 0, 0, 2.0943951024, 2.0943951024, 4.1887902048, 4.1887902048, 6.2831853072, 6.2831853072, 6.2831853072], degree=2, weights=[1, 0.5, 1, 0.5, 1, 0.5, 1]))
        make_face(mode=Mode.SUBTRACT)
    extrude(amount=-F14_DEPTH, mode=Mode.SUBTRACT)


with BuildPart() as f16:
    # F15 (on face) → F16 (new body)
    with BuildSketch(Plane.XY.offset(13.2)):
        Polygon((-22.5, 16.75), (-24.5, 16.75), (-24.5, 8.75), (-25, 8.75), (-25, -8.75), (-24.5, -8.75), (-24.5, -16.75), (-22.5, -16.75), align=None)
    extrude(amount=-F16_DEPTH)


solid = Compound([f2.part, f4.part, f6.part, f8.part, f10.part, f12.part, f16.part])
